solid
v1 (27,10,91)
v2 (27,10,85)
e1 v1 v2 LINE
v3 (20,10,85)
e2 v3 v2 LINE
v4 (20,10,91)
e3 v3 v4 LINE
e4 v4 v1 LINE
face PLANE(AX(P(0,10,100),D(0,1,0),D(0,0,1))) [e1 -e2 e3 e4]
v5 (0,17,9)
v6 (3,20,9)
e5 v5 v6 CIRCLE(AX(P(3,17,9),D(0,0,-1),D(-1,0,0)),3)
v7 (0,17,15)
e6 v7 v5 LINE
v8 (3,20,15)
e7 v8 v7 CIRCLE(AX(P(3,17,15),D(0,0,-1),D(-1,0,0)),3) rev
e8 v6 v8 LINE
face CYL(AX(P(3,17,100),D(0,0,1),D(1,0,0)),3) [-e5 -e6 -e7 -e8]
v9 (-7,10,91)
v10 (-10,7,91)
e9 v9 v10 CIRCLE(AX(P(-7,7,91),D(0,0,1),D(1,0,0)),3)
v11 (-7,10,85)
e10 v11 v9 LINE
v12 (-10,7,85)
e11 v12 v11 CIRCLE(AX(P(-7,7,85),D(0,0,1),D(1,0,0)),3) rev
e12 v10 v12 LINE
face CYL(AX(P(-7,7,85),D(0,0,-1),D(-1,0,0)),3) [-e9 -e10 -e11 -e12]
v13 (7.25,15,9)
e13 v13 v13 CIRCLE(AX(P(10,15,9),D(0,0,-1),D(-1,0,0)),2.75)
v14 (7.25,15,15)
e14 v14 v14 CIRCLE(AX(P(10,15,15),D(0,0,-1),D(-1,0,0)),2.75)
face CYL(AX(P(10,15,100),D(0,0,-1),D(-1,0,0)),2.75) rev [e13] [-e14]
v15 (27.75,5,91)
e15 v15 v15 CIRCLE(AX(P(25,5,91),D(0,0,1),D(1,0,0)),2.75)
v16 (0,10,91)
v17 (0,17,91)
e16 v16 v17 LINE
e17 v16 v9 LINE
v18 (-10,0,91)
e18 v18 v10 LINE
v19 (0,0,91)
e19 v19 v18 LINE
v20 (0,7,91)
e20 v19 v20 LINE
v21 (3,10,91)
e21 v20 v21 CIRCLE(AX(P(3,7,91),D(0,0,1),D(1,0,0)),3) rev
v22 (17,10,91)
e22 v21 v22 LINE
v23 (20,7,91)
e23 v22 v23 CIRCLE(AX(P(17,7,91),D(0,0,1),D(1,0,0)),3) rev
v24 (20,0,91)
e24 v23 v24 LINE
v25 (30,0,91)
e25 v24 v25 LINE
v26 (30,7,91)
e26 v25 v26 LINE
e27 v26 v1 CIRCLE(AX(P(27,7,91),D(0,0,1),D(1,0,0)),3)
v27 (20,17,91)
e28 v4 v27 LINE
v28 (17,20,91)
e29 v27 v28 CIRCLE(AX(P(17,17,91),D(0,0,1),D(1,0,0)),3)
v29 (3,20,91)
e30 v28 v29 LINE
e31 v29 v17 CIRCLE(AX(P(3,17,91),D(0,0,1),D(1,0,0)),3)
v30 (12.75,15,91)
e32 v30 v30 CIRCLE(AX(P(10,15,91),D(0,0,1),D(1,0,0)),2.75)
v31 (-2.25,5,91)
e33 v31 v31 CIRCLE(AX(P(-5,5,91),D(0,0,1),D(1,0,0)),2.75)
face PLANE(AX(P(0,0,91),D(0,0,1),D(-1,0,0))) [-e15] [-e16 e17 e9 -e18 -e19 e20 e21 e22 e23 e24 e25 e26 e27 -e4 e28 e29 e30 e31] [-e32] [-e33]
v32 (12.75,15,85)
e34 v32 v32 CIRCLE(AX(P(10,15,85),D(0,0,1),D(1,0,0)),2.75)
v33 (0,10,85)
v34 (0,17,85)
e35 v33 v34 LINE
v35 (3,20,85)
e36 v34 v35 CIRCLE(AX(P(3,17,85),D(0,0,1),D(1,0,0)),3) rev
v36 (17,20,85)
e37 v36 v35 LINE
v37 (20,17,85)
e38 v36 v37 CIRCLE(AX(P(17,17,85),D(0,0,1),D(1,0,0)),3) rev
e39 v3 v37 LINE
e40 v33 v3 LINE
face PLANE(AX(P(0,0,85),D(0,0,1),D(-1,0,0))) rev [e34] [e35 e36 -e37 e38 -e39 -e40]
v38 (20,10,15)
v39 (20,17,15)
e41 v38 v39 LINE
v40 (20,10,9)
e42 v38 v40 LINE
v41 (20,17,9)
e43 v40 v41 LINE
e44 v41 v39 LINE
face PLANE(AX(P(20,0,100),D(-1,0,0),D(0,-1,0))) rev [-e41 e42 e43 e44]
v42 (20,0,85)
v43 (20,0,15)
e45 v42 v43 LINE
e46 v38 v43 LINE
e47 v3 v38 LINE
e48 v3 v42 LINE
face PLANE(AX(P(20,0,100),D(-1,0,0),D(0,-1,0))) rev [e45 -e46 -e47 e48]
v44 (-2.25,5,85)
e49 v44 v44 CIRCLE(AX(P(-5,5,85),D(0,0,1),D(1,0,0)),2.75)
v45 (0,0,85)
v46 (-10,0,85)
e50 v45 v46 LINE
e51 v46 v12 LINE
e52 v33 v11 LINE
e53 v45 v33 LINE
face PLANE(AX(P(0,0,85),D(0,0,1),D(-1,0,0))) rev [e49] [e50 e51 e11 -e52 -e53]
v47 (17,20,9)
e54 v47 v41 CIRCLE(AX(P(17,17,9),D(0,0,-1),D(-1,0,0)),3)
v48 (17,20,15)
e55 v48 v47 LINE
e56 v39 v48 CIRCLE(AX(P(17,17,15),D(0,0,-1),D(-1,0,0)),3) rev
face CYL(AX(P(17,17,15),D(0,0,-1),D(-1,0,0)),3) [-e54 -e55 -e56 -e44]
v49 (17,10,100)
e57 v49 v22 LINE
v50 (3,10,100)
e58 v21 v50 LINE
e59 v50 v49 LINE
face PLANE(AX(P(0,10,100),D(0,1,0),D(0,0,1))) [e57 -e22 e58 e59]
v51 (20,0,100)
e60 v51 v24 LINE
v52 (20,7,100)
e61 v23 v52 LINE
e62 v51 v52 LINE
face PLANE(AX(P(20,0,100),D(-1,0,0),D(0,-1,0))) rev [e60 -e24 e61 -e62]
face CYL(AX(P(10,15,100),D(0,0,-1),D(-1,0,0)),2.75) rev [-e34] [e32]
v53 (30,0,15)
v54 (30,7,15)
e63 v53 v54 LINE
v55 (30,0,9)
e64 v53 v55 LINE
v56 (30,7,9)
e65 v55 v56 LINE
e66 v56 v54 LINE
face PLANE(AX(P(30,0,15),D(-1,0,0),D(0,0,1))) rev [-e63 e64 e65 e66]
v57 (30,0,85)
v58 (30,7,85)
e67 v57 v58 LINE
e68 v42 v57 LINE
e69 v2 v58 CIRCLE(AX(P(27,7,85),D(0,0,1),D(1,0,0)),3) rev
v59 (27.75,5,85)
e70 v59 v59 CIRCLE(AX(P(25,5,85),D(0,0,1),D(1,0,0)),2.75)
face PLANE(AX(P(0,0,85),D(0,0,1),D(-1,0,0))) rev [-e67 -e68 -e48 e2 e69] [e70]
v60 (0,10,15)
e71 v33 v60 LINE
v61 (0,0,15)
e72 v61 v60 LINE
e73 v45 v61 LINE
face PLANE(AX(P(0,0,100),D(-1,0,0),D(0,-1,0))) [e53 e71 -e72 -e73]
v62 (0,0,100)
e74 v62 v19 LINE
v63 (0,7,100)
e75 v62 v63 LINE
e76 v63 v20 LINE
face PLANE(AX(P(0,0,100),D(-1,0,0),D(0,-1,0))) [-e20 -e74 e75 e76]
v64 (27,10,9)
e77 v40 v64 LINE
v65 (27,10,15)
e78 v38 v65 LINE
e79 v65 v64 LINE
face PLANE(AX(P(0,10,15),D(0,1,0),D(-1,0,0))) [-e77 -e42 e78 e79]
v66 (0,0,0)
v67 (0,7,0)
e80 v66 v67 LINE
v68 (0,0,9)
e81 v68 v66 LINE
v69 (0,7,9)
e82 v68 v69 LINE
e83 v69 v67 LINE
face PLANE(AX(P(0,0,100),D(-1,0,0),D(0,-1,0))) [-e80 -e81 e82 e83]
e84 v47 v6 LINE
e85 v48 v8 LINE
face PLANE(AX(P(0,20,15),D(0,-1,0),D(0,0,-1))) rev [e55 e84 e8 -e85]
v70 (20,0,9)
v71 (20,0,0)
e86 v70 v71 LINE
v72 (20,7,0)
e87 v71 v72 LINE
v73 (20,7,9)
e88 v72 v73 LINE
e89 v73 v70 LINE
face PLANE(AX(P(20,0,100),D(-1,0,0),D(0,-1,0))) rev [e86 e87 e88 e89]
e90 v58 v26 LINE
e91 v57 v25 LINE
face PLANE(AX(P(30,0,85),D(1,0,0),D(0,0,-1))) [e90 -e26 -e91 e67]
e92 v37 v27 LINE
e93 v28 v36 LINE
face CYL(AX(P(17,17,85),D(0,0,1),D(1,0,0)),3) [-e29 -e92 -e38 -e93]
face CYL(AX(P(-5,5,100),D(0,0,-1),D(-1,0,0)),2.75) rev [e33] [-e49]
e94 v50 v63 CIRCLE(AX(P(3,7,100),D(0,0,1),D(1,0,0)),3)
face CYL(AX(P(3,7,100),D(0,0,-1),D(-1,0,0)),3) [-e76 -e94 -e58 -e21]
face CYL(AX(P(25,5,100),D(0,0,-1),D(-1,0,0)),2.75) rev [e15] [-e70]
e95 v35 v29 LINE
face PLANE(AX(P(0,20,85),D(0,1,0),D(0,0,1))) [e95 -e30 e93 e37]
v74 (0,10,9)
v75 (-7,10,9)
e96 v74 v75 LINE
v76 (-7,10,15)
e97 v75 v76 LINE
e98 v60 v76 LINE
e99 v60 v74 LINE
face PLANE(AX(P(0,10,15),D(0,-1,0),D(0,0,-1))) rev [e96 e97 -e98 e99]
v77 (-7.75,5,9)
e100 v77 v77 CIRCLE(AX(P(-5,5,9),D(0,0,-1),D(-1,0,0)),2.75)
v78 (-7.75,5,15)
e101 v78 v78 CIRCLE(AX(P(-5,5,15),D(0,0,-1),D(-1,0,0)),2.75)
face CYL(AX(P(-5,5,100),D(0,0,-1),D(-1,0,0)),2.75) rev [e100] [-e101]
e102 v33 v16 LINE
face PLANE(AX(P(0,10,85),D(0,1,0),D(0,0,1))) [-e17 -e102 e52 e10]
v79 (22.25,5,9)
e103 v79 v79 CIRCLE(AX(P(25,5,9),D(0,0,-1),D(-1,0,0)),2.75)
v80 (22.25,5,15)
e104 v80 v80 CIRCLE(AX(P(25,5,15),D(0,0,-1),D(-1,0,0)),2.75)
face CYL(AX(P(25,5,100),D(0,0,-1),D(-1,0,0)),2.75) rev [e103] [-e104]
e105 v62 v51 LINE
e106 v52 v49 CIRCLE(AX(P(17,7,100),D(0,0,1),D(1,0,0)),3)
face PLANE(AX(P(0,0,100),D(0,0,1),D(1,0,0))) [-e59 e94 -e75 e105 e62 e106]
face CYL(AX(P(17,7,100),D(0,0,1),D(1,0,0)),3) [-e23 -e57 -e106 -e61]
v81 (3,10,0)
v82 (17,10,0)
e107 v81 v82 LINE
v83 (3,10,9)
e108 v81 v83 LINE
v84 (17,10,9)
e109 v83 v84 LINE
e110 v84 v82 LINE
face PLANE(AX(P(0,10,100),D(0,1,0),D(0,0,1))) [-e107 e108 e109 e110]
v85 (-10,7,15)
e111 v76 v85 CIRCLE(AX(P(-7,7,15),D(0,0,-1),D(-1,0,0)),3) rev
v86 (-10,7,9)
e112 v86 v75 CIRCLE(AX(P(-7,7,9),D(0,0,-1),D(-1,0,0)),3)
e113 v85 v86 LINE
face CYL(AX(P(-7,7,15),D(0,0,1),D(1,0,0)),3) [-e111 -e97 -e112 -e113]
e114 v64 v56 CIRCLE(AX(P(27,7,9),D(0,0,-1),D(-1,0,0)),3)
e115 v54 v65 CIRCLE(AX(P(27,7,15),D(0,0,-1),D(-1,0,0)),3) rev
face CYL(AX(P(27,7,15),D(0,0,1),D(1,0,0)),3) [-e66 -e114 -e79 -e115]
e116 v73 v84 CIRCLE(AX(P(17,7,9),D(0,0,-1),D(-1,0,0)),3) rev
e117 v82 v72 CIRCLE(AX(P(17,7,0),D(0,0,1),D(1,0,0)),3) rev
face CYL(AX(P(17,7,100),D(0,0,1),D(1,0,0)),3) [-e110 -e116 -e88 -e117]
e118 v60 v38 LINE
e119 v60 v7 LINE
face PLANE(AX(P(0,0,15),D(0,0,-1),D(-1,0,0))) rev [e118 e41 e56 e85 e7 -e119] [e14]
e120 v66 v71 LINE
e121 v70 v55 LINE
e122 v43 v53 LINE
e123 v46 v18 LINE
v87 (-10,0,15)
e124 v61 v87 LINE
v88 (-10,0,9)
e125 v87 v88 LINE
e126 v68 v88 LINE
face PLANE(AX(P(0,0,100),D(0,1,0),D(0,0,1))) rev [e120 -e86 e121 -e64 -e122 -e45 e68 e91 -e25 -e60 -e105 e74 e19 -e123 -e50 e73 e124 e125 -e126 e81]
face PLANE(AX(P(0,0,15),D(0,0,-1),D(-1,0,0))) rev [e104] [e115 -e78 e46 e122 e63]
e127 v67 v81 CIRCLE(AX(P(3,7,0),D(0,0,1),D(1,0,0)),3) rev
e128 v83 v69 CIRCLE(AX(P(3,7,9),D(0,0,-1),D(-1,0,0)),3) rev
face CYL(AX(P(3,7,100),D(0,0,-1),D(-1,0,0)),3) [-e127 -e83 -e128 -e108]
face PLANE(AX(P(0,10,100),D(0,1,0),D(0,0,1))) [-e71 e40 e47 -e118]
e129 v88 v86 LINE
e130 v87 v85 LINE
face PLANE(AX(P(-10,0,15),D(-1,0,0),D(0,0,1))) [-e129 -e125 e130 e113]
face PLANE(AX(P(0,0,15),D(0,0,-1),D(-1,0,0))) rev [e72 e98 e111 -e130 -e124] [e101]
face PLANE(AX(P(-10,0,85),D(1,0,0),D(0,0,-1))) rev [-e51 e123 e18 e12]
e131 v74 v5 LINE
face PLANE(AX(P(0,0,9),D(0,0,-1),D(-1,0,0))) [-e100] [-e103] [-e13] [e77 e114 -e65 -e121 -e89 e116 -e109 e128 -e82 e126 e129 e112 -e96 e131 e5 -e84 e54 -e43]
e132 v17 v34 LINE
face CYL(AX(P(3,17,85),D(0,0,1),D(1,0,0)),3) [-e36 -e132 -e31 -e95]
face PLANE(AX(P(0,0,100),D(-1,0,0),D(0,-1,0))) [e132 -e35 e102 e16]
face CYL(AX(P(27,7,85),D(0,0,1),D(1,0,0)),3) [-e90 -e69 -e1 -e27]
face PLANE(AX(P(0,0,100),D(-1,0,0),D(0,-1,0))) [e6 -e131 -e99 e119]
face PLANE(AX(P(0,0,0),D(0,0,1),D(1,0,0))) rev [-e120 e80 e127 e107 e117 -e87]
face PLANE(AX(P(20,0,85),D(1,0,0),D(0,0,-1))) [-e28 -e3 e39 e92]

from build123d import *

# Parameters (mm, degrees)
SKETCH_1_W               = 20
SKETCH_1_H               = 10
EXTRUDE_1_DEPTH          = 100
EXTRUDE_START            = -9
SKETCH_2_W               = 10
SKETCH_2_H               = 10
SKETCH_2_W_2             = 20
EXTRUDE_2_DEPTH          = 6
CUT_EXTRUDE_1_DEPTH      = 98.88258272
CUT_EXTRUDE_1_DEPTH_BACK = 98.88258272
SKETCH_3_R               = 2.75
FILLET_1_R               = 3


with BuildPart() as part:
    # 草图1 → 凸台-拉伸1 (new body)
    with BuildSketch(Plane.XY):
        with Locations((10, 5)):
            Rectangle(SKETCH_1_W, SKETCH_1_H)
    extrude(amount=EXTRUDE_1_DEPTH)

    # 草图2 → 凸台-拉伸2 (add)
    with BuildSketch(Plane(origin=(0, 0, 0), x_dir=(-1, 0, 0), z_dir=(0, 0, -1)).offset(EXTRUDE_START)):
        with Locations((-25, 5)):
            Rectangle(SKETCH_2_W, SKETCH_2_H)
        with Locations((-10, 15)):
            Rectangle(SKETCH_2_W_2, SKETCH_2_H)
        with Locations((5, 5)):
            Rectangle(SKETCH_2_W, SKETCH_2_H)
    extrude_2 = extrude(amount=-EXTRUDE_2_DEPTH)

    # 镜向1: 凸台-拉伸2 across plane
    add(extrude_2.mirror(Plane(origin=(0, 0, 50), x_dir=(1, 0, 0), z_dir=(0, 0, -1))))

    # 草图3 → 切除-拉伸1 (cut, two sides: drawn at the far end of the back side and taken through both)
    with BuildSketch(Plane(origin=(0, 0, 9), x_dir=(-1, 0, 0), z_dir=(0, 0, -1)).offset(-CUT_EXTRUDE_1_DEPTH_BACK)):
        with Locations(Location((5, 5, 0), (0, 0, 180))):
            Circle(SKETCH_3_R)
        with Locations(Location((-10, 15, 0), (0, 0, 180))):
            Circle(SKETCH_3_R)
        with Locations(Location((-25, 5, 0), (0, 0, 180))):
            Circle(SKETCH_3_R)
    extrude(amount=CUT_EXTRUDE_1_DEPTH + CUT_EXTRUDE_1_DEPTH_BACK, mode=Mode.SUBTRACT)

    # 圆角1
    # the kernel refuses this fillet: 3 mm, written as the material it takes off along each edge
    with BuildSketch(Plane(origin=(0, 10, -7.5), x_dir=(0, -1, 0), z_dir=(0, 0, 1)), Plane(origin=(0, 10, 91), x_dir=(0, -1, 0), z_dir=(0, 0, 1))) as fillet_1_piece_1:
        with BuildLine():
            CenterArc((FILLET_1_R, FILLET_1_R), FILLET_1_R, 180, 90)
            Line((0, FILLET_1_R), (0, 0))
            Line((0, 0), (FILLET_1_R, 0))
        make_face()
    extrude(amount=16.5, mode=Mode.SUBTRACT)
    with BuildSketch(Plane(origin=(20, 10, -7.5), x_dir=(0, -1, 0), z_dir=(0, 0, 1)), Plane(origin=(20, 10, 91), x_dir=(0, -1, 0), z_dir=(0, 0, 1))) as fillet_1_piece_2:
        with BuildLine():
            CenterArc((FILLET_1_R, -FILLET_1_R), FILLET_1_R, 90, 90)
            Line((0, -FILLET_1_R), (0, 0))
            Line((0, 0), (FILLET_1_R, 0))
        make_face()
    extrude(amount=16.5, mode=Mode.SUBTRACT)
    with BuildSketch(Plane(origin=(20, 20, 1.5), x_dir=(0, -1, 0), z_dir=(0, 0, 1)), Plane(origin=(30, 10, 1.5), x_dir=(0, -1, 0), z_dir=(0, 0, 1)), Plane(origin=(0, 20, 98.5), x_dir=(0, -1, 0), z_dir=(0, 0, -1)), Plane(origin=(-10, 10, 98.5), x_dir=(0, -1, 0), z_dir=(0, 0, -1))) as fillet_1_piece_3:
        with BuildLine():
            CenterArc((FILLET_1_R, -FILLET_1_R), FILLET_1_R, 90, 90)
            Line((0, -FILLET_1_R), (0, 0))
            Line((0, 0), (FILLET_1_R, 0))
        make_face()
    extrude(amount=21, mode=Mode.SUBTRACT)
    with BuildSketch(Plane(origin=(0, 20, 1.5), x_dir=(0, -1, 0), z_dir=(0, 0, 1)), Plane(origin=(-10, 10, 1.5), x_dir=(0, -1, 0), z_dir=(0, 0, 1)), Plane(origin=(30, 10, 98.5), x_dir=(0, -1, 0), z_dir=(0, 0, -1)), Plane(origin=(20, 20, 98.5), x_dir=(0, -1, 0), z_dir=(0, 0, -1))) as fillet_1_piece_4:
        with BuildLine():
            CenterArc((FILLET_1_R, FILLET_1_R), FILLET_1_R, 180, 90)
            Line((0, FILLET_1_R), (0, 0))
            Line((0, 0), (FILLET_1_R, 0))
        make_face()
    extrude(amount=21, mode=Mode.SUBTRACT)


solid = part.part
